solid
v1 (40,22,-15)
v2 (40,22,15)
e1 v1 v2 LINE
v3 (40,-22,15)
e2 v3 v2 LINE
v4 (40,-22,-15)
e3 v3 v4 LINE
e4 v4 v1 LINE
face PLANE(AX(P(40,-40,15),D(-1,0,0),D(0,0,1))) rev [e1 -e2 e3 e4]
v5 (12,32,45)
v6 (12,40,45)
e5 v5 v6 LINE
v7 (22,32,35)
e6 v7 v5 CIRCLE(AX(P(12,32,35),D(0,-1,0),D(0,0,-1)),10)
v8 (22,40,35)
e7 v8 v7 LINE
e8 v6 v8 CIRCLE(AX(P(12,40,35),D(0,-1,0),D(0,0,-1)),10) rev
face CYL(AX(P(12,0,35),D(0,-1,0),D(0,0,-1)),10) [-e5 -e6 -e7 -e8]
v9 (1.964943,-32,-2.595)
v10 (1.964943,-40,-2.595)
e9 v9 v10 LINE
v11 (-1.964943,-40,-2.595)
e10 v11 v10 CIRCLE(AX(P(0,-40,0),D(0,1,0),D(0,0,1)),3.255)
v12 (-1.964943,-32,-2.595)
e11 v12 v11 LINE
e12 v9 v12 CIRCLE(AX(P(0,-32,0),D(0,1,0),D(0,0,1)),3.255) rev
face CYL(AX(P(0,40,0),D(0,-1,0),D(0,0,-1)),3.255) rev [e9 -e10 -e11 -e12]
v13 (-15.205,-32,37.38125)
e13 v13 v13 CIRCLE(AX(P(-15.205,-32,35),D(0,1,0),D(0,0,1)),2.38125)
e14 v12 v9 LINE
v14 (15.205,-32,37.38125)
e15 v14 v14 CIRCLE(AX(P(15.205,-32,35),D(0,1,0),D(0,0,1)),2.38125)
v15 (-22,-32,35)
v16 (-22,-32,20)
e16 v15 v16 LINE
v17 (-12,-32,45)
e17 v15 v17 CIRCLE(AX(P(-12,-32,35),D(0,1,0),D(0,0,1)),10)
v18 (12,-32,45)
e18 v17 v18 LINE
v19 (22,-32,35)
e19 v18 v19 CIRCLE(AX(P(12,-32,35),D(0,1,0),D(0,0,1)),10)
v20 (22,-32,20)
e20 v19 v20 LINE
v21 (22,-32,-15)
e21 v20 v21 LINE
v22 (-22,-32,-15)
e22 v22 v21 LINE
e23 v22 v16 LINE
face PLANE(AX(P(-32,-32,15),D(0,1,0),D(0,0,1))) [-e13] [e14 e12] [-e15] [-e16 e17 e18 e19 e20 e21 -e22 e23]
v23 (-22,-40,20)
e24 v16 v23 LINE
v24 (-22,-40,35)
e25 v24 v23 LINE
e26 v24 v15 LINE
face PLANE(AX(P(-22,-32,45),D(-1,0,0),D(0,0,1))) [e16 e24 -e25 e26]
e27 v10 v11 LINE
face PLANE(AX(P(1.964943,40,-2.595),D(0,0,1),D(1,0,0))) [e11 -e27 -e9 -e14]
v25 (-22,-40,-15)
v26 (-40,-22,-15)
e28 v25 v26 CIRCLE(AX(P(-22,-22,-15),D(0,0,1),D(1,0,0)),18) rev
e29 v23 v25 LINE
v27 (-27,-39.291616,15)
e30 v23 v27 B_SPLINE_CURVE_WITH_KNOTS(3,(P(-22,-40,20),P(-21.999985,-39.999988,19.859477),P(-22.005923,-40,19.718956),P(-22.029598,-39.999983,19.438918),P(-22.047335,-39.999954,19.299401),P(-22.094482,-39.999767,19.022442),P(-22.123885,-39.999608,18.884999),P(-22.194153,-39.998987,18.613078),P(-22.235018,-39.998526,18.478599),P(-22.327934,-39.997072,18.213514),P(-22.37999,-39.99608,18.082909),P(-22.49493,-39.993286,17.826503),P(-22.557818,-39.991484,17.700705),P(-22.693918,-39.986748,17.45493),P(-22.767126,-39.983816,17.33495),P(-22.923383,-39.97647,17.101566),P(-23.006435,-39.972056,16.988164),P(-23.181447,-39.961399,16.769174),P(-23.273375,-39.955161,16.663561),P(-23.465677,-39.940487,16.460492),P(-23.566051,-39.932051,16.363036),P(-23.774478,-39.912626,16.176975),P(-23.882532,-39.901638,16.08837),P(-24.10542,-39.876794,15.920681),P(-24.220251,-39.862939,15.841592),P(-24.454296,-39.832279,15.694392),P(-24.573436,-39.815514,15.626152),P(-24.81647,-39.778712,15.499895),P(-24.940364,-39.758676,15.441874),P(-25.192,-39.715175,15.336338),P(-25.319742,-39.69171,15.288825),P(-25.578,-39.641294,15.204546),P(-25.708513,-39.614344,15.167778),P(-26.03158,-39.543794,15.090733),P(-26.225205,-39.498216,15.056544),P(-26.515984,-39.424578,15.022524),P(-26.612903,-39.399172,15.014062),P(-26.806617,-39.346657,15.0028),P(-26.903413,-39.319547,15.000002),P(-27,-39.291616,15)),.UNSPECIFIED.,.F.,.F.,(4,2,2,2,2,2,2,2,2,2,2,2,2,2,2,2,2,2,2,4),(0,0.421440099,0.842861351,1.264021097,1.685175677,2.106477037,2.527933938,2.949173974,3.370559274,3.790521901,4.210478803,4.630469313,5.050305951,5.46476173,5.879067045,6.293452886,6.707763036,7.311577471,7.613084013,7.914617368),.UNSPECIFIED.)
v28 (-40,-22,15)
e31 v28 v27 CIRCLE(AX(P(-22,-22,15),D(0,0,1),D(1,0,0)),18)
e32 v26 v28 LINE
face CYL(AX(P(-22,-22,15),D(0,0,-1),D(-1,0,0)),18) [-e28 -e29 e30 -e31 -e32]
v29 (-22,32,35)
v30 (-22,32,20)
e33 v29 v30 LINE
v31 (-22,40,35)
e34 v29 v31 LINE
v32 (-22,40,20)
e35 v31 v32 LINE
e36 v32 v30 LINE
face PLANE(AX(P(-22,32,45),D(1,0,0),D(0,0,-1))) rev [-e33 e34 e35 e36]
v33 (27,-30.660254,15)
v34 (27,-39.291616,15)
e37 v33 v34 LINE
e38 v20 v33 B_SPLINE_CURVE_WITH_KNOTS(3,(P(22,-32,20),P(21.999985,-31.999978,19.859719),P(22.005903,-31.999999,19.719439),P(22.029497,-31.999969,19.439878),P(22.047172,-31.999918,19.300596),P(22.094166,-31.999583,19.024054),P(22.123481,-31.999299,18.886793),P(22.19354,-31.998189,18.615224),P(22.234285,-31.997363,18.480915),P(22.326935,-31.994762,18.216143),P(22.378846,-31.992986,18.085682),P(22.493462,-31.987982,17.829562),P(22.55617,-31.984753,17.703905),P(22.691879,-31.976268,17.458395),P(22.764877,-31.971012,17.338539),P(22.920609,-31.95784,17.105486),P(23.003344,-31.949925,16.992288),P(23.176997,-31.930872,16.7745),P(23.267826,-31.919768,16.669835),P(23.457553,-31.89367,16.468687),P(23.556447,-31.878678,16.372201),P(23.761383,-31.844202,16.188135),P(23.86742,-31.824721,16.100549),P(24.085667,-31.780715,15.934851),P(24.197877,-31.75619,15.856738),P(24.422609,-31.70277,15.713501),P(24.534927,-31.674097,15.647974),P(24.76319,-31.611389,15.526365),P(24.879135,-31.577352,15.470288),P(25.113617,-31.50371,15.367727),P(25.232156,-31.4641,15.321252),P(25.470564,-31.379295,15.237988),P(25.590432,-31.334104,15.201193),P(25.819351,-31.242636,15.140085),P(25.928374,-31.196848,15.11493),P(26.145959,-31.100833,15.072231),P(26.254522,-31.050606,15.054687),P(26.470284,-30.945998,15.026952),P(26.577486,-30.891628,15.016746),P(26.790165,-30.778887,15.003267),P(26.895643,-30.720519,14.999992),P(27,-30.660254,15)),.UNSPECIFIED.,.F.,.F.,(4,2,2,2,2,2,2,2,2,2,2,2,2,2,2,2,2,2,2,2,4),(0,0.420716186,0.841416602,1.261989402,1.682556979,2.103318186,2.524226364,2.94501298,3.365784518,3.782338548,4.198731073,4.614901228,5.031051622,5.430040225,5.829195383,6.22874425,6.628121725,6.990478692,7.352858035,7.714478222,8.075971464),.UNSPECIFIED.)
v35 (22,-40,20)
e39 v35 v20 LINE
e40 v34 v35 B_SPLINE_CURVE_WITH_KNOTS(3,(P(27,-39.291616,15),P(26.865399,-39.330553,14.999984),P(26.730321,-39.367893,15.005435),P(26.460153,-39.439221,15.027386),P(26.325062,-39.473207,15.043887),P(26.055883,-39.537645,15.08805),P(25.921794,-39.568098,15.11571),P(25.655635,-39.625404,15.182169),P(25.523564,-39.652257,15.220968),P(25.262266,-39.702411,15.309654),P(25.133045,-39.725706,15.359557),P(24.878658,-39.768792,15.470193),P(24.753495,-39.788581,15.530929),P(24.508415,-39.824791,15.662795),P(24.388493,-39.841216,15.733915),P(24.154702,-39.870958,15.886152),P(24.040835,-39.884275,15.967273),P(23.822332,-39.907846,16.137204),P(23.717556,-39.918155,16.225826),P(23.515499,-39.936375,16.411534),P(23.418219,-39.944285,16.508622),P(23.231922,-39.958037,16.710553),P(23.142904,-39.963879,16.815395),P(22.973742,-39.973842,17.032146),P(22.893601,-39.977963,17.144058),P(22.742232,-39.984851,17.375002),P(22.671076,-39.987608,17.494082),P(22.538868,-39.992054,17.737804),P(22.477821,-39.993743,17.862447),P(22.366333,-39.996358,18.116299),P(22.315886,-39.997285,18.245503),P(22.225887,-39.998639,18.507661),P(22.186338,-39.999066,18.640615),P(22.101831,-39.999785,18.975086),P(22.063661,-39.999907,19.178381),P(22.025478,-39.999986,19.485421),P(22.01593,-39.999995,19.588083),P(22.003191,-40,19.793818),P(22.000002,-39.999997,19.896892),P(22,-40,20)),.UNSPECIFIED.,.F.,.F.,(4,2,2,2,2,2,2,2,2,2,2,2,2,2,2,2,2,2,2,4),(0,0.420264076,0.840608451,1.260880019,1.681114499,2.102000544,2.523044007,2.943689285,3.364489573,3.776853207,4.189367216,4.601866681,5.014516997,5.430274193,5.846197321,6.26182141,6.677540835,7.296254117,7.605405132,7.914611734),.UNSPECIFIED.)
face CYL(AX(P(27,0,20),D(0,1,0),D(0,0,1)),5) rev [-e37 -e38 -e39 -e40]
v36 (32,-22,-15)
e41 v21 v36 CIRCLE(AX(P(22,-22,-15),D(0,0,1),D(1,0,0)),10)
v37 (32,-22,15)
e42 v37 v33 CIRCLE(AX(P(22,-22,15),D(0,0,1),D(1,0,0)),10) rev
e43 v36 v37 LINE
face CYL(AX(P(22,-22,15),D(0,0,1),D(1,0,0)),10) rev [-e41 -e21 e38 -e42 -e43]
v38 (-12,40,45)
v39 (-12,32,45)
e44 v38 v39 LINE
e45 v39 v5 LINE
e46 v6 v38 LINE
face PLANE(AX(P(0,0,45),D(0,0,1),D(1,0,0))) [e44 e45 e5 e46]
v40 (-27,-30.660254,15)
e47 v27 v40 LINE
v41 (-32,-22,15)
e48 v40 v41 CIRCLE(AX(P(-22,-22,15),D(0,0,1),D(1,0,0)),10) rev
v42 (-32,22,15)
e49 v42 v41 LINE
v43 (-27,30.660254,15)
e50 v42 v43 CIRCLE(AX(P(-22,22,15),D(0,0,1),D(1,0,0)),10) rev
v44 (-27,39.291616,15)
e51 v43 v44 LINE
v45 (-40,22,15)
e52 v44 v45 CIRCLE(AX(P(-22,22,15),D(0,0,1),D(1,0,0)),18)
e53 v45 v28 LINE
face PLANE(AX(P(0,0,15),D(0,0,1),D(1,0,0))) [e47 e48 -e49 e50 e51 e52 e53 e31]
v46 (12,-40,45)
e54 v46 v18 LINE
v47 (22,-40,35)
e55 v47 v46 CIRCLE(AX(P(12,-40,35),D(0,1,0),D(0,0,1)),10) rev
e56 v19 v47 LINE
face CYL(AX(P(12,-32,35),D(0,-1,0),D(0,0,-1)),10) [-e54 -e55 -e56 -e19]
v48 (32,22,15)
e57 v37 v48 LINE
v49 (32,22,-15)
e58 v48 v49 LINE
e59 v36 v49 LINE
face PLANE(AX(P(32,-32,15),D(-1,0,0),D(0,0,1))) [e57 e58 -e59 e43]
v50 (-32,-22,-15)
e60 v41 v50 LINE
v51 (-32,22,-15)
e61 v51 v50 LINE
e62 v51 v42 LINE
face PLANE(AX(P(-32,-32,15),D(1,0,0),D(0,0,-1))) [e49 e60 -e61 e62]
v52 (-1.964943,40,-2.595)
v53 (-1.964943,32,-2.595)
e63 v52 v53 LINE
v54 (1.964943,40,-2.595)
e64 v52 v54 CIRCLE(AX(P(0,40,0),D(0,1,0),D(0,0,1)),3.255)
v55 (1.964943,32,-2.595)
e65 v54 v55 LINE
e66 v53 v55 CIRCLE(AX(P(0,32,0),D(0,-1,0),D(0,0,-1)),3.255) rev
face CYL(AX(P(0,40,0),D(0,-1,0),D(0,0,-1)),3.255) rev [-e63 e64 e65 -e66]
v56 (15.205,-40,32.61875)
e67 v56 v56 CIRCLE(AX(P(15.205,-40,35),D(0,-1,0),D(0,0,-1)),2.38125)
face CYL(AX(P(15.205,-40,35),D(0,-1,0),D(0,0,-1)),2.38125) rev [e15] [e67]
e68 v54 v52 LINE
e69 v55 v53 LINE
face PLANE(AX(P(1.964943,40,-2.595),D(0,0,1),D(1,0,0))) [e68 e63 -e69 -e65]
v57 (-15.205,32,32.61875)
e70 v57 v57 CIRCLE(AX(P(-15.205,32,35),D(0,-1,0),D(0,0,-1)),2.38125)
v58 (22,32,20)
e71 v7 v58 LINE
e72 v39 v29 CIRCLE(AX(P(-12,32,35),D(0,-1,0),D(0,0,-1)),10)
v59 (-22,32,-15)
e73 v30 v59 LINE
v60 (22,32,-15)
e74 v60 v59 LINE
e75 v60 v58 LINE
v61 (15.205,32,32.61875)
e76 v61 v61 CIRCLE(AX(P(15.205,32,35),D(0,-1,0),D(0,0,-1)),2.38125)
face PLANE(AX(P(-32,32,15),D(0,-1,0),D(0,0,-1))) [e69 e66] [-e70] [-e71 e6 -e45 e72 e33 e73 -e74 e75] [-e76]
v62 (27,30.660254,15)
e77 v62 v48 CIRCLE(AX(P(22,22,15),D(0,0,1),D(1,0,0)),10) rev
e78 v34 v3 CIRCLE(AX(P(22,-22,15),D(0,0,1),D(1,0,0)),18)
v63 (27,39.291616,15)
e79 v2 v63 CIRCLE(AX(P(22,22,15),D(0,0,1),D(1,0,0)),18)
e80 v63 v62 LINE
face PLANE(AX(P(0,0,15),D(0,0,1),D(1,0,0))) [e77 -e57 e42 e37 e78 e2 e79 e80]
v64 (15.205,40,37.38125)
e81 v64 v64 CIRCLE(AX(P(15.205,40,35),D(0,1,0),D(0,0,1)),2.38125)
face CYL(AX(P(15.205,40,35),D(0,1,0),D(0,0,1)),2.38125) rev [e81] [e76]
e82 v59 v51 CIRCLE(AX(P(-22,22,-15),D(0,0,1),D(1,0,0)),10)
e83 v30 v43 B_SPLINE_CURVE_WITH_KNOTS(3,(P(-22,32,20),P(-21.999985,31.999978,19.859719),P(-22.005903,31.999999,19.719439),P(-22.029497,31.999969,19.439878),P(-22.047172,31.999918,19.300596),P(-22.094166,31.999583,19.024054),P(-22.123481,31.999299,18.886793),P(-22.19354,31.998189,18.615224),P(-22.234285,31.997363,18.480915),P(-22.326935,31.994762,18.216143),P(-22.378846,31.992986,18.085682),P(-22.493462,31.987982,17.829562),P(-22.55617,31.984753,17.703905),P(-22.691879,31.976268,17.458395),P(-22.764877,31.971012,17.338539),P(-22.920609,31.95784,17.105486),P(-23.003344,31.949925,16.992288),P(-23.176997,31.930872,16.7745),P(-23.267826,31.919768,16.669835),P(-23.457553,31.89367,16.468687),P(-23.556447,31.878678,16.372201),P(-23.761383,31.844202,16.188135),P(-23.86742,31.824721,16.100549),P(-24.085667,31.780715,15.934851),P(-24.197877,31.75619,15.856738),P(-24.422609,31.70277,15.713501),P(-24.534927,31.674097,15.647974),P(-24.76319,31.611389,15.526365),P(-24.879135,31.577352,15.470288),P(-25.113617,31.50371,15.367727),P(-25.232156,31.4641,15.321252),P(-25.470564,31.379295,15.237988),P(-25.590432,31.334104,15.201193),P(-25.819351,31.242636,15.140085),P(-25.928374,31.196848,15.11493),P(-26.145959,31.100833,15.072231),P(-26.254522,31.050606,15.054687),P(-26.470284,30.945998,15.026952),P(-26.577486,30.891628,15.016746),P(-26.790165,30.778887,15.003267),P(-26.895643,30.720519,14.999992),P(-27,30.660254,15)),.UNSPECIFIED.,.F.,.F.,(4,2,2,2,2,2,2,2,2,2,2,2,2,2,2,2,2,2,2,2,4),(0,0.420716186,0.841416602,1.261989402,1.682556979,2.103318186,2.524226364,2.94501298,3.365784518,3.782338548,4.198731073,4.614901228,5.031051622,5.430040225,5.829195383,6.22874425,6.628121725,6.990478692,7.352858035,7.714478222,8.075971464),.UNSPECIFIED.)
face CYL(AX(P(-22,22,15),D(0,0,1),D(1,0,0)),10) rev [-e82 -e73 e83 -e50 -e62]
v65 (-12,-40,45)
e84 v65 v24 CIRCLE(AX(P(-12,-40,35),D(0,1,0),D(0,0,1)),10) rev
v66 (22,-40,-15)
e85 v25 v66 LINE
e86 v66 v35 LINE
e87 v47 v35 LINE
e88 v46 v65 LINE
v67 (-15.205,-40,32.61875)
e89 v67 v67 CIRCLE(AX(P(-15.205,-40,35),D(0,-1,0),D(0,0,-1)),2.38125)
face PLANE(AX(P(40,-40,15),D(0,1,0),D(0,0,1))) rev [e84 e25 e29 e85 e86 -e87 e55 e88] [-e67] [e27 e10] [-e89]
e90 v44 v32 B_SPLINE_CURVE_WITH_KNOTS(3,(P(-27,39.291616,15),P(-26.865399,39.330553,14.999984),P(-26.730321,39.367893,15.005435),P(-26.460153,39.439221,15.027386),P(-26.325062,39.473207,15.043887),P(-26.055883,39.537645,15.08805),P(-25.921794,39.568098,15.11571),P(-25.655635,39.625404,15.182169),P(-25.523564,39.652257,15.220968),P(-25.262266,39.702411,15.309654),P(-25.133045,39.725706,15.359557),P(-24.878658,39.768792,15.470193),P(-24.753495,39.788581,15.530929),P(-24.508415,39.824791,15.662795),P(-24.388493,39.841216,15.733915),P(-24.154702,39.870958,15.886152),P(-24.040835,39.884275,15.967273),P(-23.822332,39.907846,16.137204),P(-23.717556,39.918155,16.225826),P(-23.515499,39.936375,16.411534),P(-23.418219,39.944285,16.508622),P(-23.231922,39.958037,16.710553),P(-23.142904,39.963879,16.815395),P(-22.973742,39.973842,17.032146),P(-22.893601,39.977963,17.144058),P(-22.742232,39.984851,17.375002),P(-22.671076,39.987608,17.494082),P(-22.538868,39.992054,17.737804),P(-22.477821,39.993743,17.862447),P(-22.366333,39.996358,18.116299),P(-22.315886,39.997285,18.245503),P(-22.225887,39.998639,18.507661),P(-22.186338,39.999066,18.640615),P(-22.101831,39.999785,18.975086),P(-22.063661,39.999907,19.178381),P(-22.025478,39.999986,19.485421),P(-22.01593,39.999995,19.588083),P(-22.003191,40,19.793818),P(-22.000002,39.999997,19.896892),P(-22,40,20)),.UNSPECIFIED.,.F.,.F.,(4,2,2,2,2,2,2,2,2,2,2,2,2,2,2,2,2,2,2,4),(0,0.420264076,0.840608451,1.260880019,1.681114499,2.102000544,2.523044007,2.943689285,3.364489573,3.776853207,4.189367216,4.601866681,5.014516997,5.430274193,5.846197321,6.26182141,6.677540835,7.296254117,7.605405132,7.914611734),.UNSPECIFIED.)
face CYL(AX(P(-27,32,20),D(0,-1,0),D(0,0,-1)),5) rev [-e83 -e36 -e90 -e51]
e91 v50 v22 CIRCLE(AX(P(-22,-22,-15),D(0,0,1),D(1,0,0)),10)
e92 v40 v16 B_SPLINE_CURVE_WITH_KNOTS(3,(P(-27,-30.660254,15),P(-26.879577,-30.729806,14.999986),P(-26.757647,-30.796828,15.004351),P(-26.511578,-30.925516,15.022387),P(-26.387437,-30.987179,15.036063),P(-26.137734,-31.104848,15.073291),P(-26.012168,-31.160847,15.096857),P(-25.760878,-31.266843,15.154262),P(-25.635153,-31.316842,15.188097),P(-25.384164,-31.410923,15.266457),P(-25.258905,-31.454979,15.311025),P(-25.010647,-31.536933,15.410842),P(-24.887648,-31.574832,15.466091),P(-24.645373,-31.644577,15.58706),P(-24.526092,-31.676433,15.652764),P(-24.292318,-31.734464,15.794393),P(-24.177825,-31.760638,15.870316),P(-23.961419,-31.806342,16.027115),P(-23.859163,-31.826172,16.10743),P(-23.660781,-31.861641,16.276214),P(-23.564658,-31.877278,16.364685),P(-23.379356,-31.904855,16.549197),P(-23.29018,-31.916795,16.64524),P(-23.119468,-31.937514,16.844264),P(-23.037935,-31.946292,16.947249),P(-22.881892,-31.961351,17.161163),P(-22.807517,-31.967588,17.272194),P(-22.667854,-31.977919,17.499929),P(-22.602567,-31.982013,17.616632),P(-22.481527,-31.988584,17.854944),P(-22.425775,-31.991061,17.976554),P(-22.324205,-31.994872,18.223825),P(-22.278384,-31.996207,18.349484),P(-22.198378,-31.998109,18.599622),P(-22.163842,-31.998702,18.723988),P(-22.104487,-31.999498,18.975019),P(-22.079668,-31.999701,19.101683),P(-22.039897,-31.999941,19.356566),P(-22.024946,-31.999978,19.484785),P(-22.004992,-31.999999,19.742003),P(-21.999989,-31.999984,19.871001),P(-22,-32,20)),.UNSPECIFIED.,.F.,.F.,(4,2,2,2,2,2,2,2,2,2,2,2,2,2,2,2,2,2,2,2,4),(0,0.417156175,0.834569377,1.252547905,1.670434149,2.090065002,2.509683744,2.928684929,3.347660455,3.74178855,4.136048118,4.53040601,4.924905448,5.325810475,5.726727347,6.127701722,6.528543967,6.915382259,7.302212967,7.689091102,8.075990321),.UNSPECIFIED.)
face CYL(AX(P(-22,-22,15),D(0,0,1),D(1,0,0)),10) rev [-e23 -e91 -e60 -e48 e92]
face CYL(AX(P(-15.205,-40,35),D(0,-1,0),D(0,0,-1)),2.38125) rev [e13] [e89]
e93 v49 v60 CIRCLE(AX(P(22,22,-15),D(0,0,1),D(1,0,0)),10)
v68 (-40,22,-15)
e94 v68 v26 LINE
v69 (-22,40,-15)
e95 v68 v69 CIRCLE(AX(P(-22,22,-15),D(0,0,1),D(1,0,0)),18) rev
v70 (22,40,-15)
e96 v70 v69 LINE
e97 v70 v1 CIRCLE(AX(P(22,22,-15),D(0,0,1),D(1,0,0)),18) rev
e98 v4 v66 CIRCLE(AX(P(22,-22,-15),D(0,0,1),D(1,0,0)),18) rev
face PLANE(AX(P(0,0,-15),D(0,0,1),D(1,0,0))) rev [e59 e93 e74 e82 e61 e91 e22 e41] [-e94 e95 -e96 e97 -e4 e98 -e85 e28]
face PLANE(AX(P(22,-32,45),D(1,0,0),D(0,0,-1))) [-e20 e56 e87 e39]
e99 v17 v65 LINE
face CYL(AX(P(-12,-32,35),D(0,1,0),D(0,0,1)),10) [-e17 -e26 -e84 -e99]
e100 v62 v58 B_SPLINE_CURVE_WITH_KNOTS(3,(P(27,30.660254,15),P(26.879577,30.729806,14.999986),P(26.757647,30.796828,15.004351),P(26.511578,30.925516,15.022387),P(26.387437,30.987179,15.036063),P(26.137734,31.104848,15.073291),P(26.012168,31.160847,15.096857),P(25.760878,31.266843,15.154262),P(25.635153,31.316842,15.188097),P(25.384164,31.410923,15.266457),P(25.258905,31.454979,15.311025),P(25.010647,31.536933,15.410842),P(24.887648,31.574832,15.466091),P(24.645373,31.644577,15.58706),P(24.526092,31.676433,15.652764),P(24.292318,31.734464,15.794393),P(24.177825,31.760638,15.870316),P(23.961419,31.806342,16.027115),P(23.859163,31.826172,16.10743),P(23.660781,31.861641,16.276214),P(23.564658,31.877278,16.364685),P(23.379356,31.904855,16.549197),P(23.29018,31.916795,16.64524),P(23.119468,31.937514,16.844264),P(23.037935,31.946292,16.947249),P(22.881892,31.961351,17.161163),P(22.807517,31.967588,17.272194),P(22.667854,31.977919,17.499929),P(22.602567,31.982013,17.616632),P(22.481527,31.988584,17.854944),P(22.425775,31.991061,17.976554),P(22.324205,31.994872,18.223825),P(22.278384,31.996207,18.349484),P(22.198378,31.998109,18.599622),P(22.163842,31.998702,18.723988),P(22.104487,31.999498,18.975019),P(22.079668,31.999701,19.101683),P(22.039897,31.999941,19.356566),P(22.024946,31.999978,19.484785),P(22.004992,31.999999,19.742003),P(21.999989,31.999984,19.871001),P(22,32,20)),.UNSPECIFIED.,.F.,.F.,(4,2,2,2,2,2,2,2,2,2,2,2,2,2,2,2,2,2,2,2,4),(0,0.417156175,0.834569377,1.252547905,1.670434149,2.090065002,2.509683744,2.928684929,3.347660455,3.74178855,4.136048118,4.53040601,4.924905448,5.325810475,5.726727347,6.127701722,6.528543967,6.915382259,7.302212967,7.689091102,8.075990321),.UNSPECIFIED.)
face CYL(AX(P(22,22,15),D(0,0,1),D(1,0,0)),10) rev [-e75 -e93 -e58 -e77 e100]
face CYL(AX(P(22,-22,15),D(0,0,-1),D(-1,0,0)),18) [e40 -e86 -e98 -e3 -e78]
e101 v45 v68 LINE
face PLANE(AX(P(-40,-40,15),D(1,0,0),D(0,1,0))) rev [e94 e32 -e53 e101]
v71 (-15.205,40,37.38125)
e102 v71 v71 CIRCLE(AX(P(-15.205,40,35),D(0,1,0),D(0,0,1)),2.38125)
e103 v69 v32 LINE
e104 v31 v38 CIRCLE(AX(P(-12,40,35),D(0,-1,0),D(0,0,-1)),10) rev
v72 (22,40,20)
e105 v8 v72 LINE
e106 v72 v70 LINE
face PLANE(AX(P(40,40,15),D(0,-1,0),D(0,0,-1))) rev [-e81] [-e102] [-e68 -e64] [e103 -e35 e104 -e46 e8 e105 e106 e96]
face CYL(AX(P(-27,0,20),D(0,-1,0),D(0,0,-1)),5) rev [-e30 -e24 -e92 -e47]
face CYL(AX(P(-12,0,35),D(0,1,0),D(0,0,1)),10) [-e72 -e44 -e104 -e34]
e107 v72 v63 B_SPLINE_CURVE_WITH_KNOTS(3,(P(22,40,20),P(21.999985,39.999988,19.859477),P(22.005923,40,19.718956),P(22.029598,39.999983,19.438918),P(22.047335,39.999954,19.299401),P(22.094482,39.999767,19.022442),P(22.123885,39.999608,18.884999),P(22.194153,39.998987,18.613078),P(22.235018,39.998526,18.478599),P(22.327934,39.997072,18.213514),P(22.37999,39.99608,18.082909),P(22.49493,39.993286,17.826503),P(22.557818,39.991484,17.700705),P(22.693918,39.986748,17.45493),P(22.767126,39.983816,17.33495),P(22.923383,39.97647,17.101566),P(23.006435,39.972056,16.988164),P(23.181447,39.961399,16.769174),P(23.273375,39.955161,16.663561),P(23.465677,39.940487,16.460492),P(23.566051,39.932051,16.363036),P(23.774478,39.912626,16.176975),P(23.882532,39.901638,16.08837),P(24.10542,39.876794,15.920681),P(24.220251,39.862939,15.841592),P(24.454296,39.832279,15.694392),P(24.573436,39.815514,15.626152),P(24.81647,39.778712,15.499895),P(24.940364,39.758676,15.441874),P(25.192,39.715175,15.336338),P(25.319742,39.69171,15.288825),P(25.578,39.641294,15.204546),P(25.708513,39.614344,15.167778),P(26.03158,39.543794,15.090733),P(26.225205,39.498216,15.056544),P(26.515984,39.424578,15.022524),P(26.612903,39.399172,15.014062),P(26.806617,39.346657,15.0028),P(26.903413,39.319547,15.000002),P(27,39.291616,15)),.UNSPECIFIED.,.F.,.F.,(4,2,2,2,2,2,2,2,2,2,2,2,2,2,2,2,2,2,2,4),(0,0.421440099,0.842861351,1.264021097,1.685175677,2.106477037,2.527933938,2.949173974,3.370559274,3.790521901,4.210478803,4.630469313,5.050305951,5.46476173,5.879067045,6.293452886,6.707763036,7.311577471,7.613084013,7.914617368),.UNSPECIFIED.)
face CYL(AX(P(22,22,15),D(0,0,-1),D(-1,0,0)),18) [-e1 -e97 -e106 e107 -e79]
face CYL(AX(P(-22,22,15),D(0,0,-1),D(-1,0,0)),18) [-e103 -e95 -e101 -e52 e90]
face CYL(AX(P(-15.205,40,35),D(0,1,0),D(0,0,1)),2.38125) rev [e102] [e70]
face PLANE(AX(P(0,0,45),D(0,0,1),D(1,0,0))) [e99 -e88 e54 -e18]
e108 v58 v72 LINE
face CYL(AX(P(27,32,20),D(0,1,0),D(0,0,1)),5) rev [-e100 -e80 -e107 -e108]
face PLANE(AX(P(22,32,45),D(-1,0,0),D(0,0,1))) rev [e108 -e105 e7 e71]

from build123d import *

# Parameters (mm, degrees)
ESQUISSE1_W                             = 80
ESQUISSE1_H                             = 80
ESQUISSE1_W_2                           = 64
ESQUISSE1_H_2                           = 64
BOSS_EXTRU_1_DEPTH                      = 15
CONG_2_R                                = 18
CONG_3_R                                = 10
ESQUISSE7_W                             = 44
ESQUISSE7_H                             = 8
BOSS_EXTRU_4_DEPTH                      = 30
PER_AGE_POUR_CROUS_AUTO_BLOQUANTS_300_D = 4.7625
CONG_1_R                                = 10
CONG_1_OF_SYM_TRIE2_R                   = 10
CONG_4_R                                = 5
ENL_V_MAT_EXTRU_3_DEPTH                 = 124.38962689


with BuildPart() as part:
    # Esquisse1 → Boss.-Extru.1 (new, symmetric)
    with BuildSketch(Plane.XY):
        Rectangle(ESQUISSE1_W, ESQUISSE1_H)
        Rectangle(ESQUISSE1_W_2, ESQUISSE1_H_2, mode=Mode.SUBTRACT)
    extrude(amount=BOSS_EXTRU_1_DEPTH, both=True)

    # Congé2
    cong_2_edges = [part.edges().sort_by_distance(p)[0] for p in [
        (-40, 40, 0),
        (40, 40, 0),
        (40, -40, 0),
        (-40, -40, 0),
    ]]
    fillet(cong_2_edges, radius=CONG_2_R)

    # Congé3
    cong_3_edges = [part.edges().sort_by_distance(p)[0] for p in [
        (32, -32, 0),
        (32, 32, 0),
        (-32, 32, 0),
        (-32, -32, 0),
    ]]
    fillet(cong_3_edges, radius=CONG_3_R)

    # Esquisse7 → Boss.-Extru.4 (add)
    with BuildSketch(Plane.XY.offset(15)):
        with Locations((0, 36)):
            Rectangle(ESQUISSE7_W, ESQUISSE7_H)
    boss_extru_4 = extrude(amount=BOSS_EXTRU_4_DEPTH)

    # Perçage pour écrous auto-bloquants 300® #6 (SP)1 (through all)
    with Locations(Plane(origin=(0, 40, 0), x_dir=(0, 0, -1), z_dir=(0, 1, 0))):
        with Locations((-35, -15.205), (-35, 15.205)):
            per_age_pour_crous_auto_bloquants_300 = Hole(PER_AGE_POUR_CROUS_AUTO_BLOQUANTS_300_D / 2)

    # Congé1
    cong_1_edges = [part.edges().sort_by_distance(p)[0] for p in [
        (22, 36, 45),
        (-22, 36, 45),
    ]]
    fillet(cong_1_edges, radius=CONG_1_R)

    # Symétrie2: Boss.-Extru.4, Perçage pour écrous auto-bloquants 300® #6 (SP)1 across plane
    add(boss_extru_4.mirror(Plane.ZX))
    add(per_age_pour_crous_auto_bloquants_300.mirror(Plane.ZX), mode=Mode.SUBTRACT)

    # Congé1 of Symétrie2
    cong_1_of_sym_trie2_edges = [part.edges().sort_by_distance(p)[0] for p in [
        (22, -36, 45),
        (-22, -36, 45),
    ]]
    fillet(cong_1_of_sym_trie2_edges, radius=CONG_1_OF_SYM_TRIE2_R)

    # Congé4
    # the kernel refuses this fillet: 5 mm, written as the material it adds along each edge
    with BuildSketch(Plane(origin=(22, -52.5, 15), x_dir=(0, 0, 1), z_dir=(0, 1, 0))) as cong_4_piece_1_section:
        with BuildLine():
            CenterArc((CONG_4_R, CONG_4_R), CONG_4_R, 180, 90)
            Line((0, CONG_4_R), (0, 0))
            Line((0, 0), (CONG_4_R, 0))
        make_face()
    cong_4_piece_1 = extrude(amount=33, mode=Mode.PRIVATE)
    cong_4_piece_1 = cong_4_piece_1 - Plane(origin=(22, -22, 16.121951886), x_dir=(0, -1, 0), z_dir=(0, 0, -1)) * Cylinder(10, 86, mode=Mode.PRIVATE)
    cong_4_piece_1 = cong_4_piece_1 & Plane(origin=(22, -22, 16.121951886), x_dir=(0, -1, 0), z_dir=(0, 0, 1)) * Cylinder(18, 86, mode=Mode.PRIVATE)
    add(cong_4_piece_1)
    with BuildSketch(Plane(origin=(-22, -19.5, 15), x_dir=(0, 0, 1), z_dir=(0, -1, 0))) as cong_4_piece_2_section:
        with BuildLine():
            CenterArc((CONG_4_R, CONG_4_R), CONG_4_R, 180, 90)
            Line((0, CONG_4_R), (0, 0))
            Line((0, 0), (CONG_4_R, 0))
        make_face()
    cong_4_piece_2 = extrude(amount=33, mode=Mode.PRIVATE)
    cong_4_piece_2 = cong_4_piece_2 - Plane(origin=(-22, -22, 15.430791952), x_dir=(0, -1, 0), z_dir=(0, 0, 1)) * Cylinder(10, 87, mode=Mode.PRIVATE)
    cong_4_piece_2 = cong_4_piece_2 & Plane(origin=(-22, -22, 15.430791952), x_dir=(0, -1, 0), z_dir=(0, 0, -1)) * Cylinder(18, 87, mode=Mode.PRIVATE)
    add(cong_4_piece_2)
    with BuildSketch(Plane(origin=(22, 52.5, 15), x_dir=(1, 0, 0), z_dir=(0, -1, 0))) as cong_4_piece_3_section:
        with BuildLine():
            CenterArc((CONG_4_R, CONG_4_R), CONG_4_R, 180, 90)
            Line((0, CONG_4_R), (0, 0))
            Line((0, 0), (CONG_4_R, 0))
        make_face()
    cong_4_piece_3 = extrude(amount=33, mode=Mode.PRIVATE)
    cong_4_piece_3 = cong_4_piece_3 - Plane(origin=(22, 22, 16.121951469), x_dir=(1, 0, 0), z_dir=(0, 0, -1)) * Cylinder(10, 86, mode=Mode.PRIVATE)
    cong_4_piece_3 = cong_4_piece_3 & Plane(origin=(22, 22, 16.121951469), x_dir=(0, 1, 0), z_dir=(0, 0, 1)) * Cylinder(18, 86, mode=Mode.PRIVATE)
    add(cong_4_piece_3)
    with BuildSketch(Plane(origin=(-22, 19.5, 15), x_dir=(-1, 0, 0), z_dir=(0, 1, 0))) as cong_4_piece_4_section:
        with BuildLine():
            CenterArc((CONG_4_R, CONG_4_R), CONG_4_R, 180, 90)
            Line((0, CONG_4_R), (0, 0))
            Line((0, 0), (CONG_4_R, 0))
        make_face()
    cong_4_piece_4 = extrude(amount=33, mode=Mode.PRIVATE)
    cong_4_piece_4 = cong_4_piece_4 - Plane(origin=(-22, 22, 15.430738001), x_dir=(0, 1, 0), z_dir=(0, 0, -1)) * Cylinder(10, 87, mode=Mode.PRIVATE)
    cong_4_piece_4 = cong_4_piece_4 & Plane(origin=(-22, 22, 15.430738001), x_dir=(0, 1, 0), z_dir=(0, 0, -1)) * Cylinder(18, 87, mode=Mode.PRIVATE)
    add(cong_4_piece_4)

    # Esquisse11 → Enlèv. mat.-Extru.3 (cut, through all)
    with BuildSketch(Plane(origin=(0, -40, -40), x_dir=(1, 0, 0), z_dir=(0, 1, 0))):
        with BuildLine():
            Line((1.964942747, -37.405), (-1.964942747, -37.405))
            ThreePointArc((-1.964942747, -37.405), (0, -43.255), (1.964942747, -37.405))
        make_face()
    extrude(amount=ENL_V_MAT_EXTRU_3_DEPTH, mode=Mode.SUBTRACT)


solid = part.part
